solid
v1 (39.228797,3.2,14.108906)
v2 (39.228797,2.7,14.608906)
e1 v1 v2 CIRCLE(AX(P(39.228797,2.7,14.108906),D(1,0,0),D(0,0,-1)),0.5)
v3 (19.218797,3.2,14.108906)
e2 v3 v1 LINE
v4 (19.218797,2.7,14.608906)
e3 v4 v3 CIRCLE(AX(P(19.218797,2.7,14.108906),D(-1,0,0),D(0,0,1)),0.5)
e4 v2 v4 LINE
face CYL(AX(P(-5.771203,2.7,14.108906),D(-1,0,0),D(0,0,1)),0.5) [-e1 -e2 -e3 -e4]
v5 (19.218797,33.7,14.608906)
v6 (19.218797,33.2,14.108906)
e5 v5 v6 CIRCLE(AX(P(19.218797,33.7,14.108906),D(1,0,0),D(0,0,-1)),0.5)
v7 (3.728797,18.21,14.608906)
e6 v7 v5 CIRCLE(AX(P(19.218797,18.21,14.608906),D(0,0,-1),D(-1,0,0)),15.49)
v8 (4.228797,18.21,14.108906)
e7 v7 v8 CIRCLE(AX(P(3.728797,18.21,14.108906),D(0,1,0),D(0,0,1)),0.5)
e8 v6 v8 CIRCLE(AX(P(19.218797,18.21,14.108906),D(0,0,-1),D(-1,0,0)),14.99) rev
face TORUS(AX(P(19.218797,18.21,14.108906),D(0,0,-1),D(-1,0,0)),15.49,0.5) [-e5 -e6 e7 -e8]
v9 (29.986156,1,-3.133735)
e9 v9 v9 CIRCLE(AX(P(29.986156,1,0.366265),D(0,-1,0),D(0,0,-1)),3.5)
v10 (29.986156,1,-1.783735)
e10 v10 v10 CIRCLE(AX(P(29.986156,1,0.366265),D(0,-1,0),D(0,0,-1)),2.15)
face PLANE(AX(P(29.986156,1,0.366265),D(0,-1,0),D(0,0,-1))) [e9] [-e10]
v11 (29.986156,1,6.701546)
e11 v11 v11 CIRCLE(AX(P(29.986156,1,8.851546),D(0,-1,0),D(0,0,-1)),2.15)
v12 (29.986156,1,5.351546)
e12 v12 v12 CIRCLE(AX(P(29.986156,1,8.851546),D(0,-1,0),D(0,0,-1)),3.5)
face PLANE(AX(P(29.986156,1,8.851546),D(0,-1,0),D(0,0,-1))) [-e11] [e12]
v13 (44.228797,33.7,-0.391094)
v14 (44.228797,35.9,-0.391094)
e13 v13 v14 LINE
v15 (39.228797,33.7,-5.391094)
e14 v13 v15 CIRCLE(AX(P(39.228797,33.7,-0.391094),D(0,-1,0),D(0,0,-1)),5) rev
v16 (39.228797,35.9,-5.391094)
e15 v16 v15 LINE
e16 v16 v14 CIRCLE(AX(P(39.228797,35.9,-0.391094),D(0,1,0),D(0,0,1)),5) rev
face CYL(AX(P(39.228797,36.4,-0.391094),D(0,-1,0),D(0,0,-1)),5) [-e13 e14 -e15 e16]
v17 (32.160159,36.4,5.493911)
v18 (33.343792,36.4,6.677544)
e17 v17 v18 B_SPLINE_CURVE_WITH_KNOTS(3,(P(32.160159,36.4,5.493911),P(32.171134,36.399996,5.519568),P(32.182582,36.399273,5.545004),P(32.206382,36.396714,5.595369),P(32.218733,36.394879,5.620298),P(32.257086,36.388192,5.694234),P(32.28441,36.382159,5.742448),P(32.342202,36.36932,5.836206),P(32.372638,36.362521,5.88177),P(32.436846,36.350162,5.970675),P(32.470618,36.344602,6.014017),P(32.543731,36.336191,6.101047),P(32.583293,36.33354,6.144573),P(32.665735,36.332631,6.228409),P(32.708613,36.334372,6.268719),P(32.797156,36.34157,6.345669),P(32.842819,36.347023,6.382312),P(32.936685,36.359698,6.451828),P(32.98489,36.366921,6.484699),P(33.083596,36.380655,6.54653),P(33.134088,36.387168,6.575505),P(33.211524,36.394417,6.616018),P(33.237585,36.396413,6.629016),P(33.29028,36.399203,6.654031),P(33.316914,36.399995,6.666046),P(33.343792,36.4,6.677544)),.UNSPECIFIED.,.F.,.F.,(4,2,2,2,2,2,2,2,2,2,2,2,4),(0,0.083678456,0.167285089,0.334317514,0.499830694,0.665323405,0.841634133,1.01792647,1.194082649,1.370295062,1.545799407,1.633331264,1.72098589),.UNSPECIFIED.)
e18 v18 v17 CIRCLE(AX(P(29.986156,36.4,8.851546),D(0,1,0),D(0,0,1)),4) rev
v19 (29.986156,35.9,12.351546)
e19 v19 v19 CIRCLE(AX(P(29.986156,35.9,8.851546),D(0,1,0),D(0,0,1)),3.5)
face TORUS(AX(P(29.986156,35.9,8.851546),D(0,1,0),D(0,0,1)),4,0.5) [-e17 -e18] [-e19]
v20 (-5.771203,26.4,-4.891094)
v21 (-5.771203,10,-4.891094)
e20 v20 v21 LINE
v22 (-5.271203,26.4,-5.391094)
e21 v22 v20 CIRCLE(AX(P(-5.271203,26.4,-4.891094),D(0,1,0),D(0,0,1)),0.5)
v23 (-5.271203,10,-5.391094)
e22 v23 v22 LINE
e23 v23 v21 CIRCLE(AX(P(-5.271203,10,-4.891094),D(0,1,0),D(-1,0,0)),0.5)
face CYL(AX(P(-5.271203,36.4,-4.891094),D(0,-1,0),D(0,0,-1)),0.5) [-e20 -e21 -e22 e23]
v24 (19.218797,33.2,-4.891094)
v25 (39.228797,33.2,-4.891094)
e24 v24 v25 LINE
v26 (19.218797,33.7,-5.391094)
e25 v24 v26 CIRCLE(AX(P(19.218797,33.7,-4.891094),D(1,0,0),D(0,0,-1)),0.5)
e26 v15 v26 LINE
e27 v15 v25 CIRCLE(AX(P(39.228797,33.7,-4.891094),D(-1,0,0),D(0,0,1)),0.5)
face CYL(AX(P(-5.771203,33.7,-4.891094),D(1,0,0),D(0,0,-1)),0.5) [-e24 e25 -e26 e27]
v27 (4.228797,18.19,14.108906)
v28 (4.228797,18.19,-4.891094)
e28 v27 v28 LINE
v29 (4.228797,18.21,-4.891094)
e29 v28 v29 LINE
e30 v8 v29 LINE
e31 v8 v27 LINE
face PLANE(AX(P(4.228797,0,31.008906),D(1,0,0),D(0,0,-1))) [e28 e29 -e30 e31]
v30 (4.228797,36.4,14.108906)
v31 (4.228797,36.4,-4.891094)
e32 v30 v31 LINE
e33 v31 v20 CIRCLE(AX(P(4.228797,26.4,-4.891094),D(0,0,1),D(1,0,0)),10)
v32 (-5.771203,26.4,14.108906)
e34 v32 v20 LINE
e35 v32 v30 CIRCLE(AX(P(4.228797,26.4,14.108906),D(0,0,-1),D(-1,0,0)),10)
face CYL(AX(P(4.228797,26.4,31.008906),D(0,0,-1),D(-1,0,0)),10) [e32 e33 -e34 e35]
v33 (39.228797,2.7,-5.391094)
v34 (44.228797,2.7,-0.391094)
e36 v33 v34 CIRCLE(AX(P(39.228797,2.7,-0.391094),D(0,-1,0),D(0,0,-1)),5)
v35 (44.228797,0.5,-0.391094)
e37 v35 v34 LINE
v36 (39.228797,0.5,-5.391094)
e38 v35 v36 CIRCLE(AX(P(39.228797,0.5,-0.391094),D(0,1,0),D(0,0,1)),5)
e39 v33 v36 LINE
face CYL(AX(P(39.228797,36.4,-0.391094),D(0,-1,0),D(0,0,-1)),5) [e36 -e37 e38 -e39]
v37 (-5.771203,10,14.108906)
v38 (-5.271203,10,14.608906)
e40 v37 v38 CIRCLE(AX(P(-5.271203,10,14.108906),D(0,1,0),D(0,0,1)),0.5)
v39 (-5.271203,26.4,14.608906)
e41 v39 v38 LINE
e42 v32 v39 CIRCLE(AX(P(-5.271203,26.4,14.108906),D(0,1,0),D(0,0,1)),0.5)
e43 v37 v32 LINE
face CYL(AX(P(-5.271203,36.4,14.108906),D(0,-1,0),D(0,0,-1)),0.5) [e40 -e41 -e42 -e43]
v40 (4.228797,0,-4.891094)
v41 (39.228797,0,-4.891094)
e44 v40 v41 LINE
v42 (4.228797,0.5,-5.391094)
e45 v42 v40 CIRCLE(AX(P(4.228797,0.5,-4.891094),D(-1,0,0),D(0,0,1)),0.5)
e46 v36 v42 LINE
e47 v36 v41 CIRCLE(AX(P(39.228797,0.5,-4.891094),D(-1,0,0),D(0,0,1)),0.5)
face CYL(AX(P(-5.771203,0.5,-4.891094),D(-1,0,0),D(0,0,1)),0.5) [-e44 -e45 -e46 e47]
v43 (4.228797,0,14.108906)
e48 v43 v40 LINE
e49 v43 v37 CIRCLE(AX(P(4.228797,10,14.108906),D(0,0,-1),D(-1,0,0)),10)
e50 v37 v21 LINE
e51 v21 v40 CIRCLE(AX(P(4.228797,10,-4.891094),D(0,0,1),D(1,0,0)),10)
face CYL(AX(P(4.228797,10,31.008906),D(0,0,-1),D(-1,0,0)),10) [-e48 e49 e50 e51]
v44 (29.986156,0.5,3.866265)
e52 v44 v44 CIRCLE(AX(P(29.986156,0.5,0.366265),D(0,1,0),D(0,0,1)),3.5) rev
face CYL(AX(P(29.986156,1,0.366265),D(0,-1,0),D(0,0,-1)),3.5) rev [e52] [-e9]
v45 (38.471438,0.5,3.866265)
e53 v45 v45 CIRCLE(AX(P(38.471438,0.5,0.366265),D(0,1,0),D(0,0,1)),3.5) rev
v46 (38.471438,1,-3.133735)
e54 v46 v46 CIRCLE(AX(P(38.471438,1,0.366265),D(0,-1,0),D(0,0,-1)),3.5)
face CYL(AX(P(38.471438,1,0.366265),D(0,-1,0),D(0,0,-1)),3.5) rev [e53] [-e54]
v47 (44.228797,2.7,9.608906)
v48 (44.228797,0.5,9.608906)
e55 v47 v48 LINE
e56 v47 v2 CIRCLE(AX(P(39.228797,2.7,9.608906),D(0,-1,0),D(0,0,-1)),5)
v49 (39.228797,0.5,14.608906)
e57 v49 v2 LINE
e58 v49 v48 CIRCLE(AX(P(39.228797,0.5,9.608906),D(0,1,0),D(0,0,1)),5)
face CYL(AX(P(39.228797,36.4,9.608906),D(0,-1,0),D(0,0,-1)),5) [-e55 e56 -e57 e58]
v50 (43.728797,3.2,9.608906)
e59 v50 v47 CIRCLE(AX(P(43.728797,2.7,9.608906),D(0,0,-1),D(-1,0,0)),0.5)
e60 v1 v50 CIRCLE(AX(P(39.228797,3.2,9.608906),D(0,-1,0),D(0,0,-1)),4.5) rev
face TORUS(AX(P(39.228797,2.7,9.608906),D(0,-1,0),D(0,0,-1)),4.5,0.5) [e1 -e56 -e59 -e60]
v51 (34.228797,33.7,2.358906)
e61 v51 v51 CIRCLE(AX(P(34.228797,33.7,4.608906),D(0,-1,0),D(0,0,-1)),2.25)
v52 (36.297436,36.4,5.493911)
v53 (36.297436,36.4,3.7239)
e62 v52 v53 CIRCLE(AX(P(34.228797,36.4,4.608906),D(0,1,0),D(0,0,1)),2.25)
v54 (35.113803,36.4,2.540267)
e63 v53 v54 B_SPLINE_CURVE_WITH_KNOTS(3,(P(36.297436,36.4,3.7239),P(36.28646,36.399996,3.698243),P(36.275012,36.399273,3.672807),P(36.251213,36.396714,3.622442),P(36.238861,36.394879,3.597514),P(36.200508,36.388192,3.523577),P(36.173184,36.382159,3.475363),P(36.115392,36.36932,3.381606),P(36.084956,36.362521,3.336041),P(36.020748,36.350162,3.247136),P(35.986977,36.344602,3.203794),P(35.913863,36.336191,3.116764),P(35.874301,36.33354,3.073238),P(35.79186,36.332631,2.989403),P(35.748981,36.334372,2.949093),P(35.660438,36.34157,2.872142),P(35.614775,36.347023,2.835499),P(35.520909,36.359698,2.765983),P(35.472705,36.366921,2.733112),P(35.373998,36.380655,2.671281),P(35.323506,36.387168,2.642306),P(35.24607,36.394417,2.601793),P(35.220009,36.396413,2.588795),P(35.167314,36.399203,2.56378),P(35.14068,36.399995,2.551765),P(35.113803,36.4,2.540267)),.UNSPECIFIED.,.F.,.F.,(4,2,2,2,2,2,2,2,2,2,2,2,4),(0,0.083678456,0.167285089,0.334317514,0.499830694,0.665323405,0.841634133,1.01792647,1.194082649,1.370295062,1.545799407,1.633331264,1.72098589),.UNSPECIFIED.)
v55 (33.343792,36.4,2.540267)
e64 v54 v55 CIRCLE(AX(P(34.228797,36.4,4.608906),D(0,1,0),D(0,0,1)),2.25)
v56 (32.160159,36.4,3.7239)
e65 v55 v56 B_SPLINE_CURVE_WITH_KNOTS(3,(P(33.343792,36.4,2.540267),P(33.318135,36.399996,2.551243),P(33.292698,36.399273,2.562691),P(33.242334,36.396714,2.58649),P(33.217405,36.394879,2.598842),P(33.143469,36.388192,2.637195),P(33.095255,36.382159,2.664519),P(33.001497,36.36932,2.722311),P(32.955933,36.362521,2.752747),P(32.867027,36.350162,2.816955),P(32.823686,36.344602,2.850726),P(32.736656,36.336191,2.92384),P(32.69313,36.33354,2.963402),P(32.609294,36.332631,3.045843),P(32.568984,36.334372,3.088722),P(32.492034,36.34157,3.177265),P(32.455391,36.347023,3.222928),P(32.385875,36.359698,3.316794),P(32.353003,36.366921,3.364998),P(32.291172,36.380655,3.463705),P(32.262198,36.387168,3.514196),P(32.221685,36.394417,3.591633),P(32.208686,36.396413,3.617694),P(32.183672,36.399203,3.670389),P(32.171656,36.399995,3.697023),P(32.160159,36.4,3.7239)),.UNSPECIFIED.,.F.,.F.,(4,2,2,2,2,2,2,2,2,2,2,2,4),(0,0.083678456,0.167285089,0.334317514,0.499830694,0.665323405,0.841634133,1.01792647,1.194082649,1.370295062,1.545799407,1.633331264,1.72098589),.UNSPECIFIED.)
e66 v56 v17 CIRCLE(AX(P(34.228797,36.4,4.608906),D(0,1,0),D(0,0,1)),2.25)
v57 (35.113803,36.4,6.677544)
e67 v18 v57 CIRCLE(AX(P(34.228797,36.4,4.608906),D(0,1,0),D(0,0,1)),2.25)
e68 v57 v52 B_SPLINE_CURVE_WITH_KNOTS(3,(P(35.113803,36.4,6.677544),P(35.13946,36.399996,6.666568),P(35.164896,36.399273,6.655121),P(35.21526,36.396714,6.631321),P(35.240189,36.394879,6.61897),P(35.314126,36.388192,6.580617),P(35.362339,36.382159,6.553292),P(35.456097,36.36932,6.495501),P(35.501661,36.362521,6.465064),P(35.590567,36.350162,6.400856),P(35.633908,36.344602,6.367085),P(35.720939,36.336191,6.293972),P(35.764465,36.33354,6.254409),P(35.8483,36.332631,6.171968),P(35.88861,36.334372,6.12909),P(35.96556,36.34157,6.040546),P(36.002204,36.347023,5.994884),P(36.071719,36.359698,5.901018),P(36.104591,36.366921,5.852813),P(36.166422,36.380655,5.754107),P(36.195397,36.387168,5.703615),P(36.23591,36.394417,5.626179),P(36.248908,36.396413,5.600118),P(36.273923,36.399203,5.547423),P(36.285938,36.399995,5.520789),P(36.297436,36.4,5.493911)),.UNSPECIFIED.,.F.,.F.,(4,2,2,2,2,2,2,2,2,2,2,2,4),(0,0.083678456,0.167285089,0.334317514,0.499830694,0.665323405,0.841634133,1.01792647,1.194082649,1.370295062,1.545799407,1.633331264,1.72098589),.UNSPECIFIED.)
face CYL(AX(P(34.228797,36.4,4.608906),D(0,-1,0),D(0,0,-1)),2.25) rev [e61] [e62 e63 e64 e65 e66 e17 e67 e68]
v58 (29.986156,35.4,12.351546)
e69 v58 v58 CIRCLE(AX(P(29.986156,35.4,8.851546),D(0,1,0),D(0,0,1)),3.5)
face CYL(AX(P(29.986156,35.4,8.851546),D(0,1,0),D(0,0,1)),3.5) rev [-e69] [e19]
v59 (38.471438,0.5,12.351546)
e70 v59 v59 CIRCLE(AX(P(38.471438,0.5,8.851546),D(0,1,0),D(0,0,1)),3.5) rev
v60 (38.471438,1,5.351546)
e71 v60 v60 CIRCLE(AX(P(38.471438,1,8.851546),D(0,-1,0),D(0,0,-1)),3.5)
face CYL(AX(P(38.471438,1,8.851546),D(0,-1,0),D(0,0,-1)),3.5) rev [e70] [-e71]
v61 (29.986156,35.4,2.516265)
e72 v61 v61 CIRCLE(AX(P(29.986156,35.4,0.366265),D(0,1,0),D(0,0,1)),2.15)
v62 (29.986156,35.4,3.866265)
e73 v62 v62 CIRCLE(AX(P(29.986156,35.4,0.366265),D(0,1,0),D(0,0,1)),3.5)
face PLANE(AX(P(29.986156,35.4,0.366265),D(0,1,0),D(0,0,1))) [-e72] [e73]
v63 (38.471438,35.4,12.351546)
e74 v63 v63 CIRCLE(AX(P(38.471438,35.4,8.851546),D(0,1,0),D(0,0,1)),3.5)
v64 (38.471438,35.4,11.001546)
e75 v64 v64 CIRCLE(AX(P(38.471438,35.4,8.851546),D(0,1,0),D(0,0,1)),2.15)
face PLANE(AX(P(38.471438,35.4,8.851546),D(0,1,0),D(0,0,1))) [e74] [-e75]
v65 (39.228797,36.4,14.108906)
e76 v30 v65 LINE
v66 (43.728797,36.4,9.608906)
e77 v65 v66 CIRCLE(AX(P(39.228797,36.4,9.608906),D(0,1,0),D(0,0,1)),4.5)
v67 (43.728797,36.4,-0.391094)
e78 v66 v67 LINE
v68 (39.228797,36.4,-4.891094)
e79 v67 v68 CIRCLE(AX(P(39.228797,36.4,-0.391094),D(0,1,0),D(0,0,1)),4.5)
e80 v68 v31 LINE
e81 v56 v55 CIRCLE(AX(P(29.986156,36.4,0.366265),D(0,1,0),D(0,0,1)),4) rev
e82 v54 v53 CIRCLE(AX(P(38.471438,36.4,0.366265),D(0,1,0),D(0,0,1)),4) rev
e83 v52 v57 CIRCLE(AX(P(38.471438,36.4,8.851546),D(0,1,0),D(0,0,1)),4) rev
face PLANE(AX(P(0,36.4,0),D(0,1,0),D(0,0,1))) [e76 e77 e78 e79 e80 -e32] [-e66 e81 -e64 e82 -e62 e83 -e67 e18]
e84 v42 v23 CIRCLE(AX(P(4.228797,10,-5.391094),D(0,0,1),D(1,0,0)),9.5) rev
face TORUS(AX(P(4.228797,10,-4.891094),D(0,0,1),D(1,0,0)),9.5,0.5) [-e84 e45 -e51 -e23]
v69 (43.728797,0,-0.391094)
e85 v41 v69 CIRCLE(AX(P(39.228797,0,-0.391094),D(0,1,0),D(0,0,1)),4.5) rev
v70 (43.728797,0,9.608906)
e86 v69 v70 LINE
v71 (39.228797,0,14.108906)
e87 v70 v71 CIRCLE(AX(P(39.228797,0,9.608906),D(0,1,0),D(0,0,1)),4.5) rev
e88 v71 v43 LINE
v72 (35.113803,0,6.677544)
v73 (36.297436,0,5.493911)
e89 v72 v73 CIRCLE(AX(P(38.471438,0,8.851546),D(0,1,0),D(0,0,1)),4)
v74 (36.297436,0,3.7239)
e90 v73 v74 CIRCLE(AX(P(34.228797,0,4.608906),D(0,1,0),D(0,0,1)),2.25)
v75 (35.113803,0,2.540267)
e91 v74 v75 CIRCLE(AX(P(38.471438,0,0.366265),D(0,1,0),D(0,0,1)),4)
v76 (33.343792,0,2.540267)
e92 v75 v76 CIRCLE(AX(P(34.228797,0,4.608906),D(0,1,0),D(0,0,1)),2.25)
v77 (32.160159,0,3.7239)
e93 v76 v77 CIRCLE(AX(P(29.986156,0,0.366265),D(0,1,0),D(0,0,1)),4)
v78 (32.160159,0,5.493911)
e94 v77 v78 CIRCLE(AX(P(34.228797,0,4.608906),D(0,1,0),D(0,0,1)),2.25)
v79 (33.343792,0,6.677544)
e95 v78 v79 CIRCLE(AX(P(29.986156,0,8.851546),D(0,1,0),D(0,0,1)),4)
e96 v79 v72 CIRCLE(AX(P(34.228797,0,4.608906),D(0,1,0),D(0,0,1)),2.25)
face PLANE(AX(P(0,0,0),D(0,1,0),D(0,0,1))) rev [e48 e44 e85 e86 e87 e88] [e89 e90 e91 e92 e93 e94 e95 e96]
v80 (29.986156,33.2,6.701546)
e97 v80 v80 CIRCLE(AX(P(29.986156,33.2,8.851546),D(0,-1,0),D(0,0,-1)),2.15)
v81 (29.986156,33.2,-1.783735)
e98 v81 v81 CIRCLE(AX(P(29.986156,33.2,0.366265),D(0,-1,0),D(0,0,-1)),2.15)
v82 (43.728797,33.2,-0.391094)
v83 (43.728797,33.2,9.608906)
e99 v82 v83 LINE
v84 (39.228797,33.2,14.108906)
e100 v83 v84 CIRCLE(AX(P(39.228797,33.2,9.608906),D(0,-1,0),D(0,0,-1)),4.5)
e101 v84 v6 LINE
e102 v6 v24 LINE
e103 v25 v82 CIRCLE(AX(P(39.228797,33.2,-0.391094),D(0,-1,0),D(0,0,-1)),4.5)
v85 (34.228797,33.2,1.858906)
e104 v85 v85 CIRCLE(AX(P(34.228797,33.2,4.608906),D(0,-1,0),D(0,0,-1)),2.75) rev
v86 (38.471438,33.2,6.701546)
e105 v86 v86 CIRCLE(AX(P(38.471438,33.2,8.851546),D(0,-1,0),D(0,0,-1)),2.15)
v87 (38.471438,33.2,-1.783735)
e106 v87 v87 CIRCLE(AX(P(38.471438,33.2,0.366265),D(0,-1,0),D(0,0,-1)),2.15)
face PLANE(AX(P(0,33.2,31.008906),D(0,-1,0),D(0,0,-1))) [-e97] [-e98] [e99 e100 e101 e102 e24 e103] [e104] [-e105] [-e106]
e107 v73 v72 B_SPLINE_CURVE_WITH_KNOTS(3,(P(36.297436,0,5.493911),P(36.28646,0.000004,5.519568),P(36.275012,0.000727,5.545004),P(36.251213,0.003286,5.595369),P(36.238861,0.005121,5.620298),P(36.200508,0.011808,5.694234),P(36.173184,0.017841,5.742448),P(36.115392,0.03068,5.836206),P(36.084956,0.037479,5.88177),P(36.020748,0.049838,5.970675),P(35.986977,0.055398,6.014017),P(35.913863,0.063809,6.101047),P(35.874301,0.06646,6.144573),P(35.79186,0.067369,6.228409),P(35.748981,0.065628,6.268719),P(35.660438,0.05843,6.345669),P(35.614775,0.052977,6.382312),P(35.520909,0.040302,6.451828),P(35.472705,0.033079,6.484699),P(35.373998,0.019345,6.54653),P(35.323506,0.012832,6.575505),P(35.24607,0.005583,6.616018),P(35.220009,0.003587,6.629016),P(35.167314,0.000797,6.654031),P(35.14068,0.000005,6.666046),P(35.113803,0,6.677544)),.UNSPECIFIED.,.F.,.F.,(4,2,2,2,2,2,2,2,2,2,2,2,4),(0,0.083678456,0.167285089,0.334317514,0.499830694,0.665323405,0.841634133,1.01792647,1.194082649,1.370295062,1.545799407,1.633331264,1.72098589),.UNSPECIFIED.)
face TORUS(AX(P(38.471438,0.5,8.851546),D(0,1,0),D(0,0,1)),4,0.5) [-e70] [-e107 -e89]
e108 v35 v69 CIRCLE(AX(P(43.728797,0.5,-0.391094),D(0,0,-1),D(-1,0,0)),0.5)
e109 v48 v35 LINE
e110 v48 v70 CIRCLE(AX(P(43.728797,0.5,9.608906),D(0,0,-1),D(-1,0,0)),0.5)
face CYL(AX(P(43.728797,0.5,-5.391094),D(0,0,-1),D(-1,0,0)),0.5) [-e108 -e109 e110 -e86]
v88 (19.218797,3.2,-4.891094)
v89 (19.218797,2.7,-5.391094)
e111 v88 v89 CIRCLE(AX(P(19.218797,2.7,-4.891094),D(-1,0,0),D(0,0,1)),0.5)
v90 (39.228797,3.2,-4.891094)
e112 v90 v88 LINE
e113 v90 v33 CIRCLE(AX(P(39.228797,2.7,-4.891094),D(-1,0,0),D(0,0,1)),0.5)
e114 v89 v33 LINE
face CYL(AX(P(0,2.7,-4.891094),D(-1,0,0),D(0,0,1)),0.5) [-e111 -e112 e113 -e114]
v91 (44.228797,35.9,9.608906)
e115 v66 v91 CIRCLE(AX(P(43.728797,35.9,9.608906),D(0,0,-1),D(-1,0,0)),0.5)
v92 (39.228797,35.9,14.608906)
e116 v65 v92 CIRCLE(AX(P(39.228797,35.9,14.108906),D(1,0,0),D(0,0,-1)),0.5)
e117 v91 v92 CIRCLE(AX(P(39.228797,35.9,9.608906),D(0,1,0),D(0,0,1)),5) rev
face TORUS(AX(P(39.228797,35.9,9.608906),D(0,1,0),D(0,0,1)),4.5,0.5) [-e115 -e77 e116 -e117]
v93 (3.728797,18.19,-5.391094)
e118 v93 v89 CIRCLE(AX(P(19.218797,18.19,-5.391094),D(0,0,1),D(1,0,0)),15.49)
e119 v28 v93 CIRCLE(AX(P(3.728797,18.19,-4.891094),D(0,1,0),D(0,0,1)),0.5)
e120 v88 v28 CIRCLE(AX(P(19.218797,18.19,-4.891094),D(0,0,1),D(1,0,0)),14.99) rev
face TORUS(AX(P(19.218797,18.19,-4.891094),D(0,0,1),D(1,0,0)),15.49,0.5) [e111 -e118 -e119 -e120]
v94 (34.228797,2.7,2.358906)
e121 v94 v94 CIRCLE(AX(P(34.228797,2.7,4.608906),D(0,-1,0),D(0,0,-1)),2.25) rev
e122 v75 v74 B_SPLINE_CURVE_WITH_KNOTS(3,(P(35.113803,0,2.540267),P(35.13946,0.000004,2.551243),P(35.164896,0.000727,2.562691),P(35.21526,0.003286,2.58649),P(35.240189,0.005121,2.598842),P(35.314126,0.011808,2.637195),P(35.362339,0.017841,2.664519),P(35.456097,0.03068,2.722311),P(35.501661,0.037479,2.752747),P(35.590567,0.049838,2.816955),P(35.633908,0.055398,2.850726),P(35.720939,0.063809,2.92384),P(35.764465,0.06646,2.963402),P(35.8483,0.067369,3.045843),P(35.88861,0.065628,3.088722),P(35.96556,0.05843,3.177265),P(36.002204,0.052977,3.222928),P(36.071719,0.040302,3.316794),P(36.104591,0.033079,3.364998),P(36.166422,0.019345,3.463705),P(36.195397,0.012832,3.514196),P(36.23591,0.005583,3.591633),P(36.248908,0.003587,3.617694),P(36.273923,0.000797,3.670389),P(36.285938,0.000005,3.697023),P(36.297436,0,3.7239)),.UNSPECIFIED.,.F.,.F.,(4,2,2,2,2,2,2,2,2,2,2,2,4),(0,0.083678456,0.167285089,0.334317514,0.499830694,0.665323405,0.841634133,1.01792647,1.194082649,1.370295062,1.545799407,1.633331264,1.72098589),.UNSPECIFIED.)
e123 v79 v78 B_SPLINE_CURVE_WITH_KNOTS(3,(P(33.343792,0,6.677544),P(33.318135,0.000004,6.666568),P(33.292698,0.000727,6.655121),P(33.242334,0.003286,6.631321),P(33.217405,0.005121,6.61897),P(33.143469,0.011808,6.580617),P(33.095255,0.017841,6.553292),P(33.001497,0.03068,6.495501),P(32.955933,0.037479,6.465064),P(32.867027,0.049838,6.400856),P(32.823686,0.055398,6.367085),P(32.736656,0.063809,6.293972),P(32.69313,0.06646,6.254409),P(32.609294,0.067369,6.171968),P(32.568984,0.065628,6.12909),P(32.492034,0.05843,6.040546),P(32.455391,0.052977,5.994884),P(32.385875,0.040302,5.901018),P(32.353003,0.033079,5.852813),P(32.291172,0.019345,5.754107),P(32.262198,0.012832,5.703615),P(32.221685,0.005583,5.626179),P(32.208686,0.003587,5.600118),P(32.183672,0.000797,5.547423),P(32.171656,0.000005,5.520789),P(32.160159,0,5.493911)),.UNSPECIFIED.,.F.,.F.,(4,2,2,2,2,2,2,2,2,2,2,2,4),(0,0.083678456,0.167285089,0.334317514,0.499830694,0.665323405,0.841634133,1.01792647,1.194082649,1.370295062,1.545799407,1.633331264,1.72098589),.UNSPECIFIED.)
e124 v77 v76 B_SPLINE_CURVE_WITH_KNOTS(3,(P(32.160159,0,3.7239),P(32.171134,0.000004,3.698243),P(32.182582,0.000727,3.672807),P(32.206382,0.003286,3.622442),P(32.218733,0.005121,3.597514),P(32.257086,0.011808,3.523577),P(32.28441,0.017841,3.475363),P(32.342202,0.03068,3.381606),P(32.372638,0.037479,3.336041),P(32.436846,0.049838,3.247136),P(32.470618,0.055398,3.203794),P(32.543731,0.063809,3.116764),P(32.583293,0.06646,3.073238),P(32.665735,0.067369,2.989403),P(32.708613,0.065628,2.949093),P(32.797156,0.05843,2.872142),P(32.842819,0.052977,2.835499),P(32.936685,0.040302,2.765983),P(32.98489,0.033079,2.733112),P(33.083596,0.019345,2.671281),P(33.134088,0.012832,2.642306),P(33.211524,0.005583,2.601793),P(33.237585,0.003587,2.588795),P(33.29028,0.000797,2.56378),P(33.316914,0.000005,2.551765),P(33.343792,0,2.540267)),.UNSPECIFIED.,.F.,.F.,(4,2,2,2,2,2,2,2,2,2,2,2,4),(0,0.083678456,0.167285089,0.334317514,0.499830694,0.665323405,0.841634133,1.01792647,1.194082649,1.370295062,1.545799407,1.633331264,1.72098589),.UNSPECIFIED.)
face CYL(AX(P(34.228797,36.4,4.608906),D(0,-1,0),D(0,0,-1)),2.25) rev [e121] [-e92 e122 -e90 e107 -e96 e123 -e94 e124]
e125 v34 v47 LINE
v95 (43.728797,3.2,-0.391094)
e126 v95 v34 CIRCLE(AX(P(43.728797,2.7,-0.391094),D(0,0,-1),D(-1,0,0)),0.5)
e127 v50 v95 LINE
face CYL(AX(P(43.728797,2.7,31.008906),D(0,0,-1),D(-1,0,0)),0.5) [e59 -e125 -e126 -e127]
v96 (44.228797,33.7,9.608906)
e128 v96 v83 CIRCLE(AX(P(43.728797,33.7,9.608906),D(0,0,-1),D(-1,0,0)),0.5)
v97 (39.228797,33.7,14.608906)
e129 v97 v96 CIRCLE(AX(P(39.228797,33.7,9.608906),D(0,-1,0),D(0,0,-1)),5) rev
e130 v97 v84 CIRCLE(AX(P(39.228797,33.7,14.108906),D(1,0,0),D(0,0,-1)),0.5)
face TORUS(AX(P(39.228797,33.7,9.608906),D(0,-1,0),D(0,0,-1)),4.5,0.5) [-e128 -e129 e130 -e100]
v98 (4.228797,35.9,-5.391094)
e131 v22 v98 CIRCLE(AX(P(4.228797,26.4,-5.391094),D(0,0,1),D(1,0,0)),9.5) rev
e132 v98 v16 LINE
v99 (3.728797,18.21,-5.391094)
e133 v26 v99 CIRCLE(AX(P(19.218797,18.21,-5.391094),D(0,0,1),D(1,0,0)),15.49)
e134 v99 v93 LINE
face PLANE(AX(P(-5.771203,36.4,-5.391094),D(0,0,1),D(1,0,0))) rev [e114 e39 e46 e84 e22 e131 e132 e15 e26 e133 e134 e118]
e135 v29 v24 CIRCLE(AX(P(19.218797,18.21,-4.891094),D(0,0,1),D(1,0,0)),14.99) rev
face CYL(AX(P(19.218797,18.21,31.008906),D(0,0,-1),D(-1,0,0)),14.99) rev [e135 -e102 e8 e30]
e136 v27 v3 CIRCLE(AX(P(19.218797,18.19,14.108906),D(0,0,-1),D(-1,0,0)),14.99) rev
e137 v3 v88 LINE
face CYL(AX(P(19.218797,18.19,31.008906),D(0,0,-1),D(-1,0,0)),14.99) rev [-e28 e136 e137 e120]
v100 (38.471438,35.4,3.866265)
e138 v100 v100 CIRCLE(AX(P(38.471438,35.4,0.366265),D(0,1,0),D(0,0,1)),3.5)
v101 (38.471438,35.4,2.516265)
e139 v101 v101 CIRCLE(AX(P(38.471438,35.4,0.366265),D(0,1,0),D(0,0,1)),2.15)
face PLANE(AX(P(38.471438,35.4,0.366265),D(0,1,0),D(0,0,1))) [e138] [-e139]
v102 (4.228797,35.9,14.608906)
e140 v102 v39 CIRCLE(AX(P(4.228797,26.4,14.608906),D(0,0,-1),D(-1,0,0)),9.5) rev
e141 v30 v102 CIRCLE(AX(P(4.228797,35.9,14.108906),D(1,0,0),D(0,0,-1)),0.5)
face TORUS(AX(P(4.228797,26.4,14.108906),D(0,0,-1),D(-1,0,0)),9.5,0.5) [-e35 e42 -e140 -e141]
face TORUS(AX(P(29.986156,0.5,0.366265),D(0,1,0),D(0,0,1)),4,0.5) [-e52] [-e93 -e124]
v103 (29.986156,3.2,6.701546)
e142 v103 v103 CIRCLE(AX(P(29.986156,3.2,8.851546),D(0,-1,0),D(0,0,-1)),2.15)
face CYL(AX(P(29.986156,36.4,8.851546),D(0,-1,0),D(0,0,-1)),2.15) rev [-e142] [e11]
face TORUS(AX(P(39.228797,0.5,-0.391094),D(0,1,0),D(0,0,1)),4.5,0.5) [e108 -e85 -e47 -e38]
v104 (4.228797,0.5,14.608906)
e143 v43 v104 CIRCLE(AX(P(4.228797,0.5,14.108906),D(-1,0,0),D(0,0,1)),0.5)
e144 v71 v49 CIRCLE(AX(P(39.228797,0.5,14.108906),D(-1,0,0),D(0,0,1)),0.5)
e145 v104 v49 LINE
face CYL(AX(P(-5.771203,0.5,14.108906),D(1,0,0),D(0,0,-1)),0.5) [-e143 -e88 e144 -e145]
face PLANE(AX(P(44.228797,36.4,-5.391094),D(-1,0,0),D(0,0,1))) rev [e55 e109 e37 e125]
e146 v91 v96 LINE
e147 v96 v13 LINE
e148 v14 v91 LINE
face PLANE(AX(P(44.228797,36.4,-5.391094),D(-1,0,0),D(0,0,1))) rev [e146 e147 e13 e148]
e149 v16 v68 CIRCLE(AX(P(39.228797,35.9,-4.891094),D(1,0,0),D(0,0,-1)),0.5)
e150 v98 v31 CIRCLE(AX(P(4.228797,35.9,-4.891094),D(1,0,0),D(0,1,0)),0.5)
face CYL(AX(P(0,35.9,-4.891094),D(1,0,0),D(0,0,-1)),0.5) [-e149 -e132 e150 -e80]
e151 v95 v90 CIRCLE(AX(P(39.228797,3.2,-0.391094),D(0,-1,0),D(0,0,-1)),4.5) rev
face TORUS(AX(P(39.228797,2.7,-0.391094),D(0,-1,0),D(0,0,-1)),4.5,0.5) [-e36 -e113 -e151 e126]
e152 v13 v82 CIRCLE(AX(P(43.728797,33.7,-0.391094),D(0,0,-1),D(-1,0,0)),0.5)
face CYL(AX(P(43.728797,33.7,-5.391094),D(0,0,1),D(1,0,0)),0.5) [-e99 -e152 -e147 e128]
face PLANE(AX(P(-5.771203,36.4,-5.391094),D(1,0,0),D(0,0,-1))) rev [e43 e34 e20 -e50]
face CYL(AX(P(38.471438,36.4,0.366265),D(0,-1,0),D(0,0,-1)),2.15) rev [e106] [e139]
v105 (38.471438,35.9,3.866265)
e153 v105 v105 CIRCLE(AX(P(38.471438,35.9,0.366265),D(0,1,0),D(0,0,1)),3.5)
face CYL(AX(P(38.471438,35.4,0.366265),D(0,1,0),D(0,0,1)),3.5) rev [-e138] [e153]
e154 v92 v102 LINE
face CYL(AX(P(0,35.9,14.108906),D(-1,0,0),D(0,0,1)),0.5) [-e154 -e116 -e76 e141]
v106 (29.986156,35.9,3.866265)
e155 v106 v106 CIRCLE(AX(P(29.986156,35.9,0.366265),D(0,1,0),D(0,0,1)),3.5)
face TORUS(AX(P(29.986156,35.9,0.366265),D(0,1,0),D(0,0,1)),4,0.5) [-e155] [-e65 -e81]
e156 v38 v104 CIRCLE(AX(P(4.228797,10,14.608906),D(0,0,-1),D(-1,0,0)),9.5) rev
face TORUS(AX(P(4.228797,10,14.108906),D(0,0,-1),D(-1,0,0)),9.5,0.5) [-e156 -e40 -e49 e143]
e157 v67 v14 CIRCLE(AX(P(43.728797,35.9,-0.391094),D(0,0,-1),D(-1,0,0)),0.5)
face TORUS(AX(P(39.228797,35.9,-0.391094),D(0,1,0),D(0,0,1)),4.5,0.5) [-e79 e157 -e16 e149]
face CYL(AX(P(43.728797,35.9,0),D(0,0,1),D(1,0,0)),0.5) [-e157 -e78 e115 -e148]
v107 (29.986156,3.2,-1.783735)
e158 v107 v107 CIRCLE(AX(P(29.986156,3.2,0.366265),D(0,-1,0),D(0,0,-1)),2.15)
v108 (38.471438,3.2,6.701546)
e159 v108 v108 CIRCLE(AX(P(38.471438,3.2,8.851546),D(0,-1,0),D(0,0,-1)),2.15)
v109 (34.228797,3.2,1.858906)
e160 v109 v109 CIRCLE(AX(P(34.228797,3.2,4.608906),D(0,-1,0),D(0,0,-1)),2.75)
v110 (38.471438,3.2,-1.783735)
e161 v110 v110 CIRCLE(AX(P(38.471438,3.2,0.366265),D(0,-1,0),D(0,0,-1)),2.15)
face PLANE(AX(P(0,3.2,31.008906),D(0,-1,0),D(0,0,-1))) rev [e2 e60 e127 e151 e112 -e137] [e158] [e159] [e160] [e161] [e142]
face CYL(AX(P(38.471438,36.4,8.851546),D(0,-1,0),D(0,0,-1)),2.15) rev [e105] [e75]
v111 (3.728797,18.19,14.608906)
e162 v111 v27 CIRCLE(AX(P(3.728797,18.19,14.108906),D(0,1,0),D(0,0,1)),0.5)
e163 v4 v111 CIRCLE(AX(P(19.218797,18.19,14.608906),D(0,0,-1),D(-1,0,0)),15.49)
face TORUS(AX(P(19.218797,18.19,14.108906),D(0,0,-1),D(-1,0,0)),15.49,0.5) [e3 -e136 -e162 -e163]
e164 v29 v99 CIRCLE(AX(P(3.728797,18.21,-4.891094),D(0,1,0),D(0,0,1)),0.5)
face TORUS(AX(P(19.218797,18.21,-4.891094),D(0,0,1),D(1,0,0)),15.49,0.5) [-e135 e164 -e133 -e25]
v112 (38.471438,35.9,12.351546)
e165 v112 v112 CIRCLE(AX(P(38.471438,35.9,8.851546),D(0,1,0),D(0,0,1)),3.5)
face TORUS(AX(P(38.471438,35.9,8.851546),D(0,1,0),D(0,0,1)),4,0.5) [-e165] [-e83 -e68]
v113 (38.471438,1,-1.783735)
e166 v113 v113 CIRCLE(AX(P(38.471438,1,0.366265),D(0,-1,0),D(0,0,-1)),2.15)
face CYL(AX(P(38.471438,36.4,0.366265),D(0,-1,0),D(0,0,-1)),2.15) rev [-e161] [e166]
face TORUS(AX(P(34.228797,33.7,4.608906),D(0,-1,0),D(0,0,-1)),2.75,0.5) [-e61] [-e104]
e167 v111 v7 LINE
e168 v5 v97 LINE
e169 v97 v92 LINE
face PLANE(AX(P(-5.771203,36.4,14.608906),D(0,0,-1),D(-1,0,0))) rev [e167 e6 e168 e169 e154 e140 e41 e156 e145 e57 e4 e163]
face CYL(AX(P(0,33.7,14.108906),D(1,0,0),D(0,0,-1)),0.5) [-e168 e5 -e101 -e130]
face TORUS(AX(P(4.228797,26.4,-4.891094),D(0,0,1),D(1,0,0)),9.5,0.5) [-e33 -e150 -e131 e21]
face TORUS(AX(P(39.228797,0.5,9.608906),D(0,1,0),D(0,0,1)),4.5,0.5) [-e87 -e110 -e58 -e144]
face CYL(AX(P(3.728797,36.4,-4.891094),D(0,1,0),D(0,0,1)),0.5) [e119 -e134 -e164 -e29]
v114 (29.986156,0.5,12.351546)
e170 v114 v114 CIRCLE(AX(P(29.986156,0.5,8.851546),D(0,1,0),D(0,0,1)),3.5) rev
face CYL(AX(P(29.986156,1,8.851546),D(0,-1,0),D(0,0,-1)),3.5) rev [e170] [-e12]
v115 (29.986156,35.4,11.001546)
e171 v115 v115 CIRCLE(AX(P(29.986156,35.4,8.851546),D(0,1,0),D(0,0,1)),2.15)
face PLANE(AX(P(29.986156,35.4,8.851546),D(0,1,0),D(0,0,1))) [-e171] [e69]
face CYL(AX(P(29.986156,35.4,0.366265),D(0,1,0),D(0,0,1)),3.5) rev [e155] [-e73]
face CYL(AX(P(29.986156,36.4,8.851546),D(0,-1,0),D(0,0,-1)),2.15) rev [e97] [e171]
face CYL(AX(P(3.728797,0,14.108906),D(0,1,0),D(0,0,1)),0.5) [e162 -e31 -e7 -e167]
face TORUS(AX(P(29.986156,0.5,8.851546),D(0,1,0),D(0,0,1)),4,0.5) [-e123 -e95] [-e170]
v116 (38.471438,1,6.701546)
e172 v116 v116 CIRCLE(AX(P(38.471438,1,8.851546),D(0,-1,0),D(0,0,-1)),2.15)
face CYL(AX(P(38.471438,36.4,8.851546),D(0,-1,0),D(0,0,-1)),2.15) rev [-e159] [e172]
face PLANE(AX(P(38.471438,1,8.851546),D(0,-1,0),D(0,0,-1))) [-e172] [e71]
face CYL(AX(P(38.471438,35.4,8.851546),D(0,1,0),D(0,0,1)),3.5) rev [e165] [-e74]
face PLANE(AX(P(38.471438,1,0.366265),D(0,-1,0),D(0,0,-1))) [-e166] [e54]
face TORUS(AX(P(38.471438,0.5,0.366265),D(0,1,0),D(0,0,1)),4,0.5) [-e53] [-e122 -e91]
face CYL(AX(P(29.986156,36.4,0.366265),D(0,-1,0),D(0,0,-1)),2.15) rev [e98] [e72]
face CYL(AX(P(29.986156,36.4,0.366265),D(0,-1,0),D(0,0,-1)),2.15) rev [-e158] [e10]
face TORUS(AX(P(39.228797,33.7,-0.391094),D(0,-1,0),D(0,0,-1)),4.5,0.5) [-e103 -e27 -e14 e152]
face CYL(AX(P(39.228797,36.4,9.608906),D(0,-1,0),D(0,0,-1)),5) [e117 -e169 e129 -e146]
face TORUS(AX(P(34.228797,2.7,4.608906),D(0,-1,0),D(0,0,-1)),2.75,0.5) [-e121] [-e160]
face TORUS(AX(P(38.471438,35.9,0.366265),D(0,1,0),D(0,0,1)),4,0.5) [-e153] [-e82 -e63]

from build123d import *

# Parameters (mm, degrees)
SKETCH1_W           = 50
SKETCH1_H           = 20
SKETCH1_R           = 2.25
SKETCH1_R_2         = 2.15
BOSS_EXTRUDE1_DEPTH = 36.4
CUT_EXTRUDE1_DEPTH  = 36.4
SKETCH4_R           = 3.5
CUT_EXTRUDE2_DEPTH  = 1
FILLET1_R           = 0.5
FILLET2_R           = 0.5
CUT_EXTRUDE3_START  = -1
SKETCH6_R           = 3.5
CUT_EXTRUDE3_DEPTH  = 1
FILLET3_R           = 0.5
FILLET4_R           = 5
FILLET5_R           = 0.5


with BuildPart() as part:
    # Sketch1 → Boss-Extrude1 (new body)
    with BuildSketch(Plane(origin=(0, 0, 0), x_dir=(1, 0, 0), z_dir=(0, 1, 0))):
        with Locations((19.228797112, -4.608905713)):
            Rectangle(SKETCH1_W, SKETCH1_H)
        with Locations(Location((34.228797112, -4.608905713, 0), (0, 0, 270))):
            Circle(SKETCH1_R, mode=Mode.SUBTRACT)
        with Locations(Location((38.471437799, -8.8515464, 0), (0, 0, 270))):
            Circle(SKETCH1_R_2, mode=Mode.SUBTRACT)
        with Locations(Location((29.986156424, -8.8515464, 0), (0, 0, 270))):
            Circle(SKETCH1_R_2, mode=Mode.SUBTRACT)
        with Locations(Location((29.986156424, -0.366265025, 0), (0, 0, 270))):
            Circle(SKETCH1_R_2, mode=Mode.SUBTRACT)
        with Locations(Location((38.471437799, -0.366265025, 0), (0, 0, 270))):
            Circle(SKETCH1_R_2, mode=Mode.SUBTRACT)
    extrude(amount=BOSS_EXTRUDE1_DEPTH)

    # Sketch2 → Cut-Extrude1 (cut)
    with BuildSketch(Plane(origin=(0, 0, -5.391094287), x_dir=(-1, 0, 0), z_dir=(0, 0, -1))):
        with BuildLine():
            Line((-19.218797112, 33.2), (-44.228797112, 33.2))
            Line((-44.228797112, 33.2), (-44.228797112, 3.2))
            Line((-44.228797112, 3.2), (-19.218797112, 3.2))
            ThreePointArc((-19.218797112, 3.2), (-8.619266462, 7.59046935), (-4.228797112, 18.19))
            Line((-4.228797112, 18.19), (-4.228797112, 18.21))
            ThreePointArc((-4.228797112, 18.21), (-8.619266462, 28.80953065), (-19.218797112, 33.2))
        make_face()
        with BuildLine():
            Line((5.771202888, 36.4), (-4.228797112, 36.4))
            ThreePointArc((-4.228797112, 36.4), (2.8422707, 33.471067812), (5.771202888, 26.4))
            Line((5.771202888, 26.4), (5.771202888, 36.4))
        make_face()
        with BuildLine():
            ThreePointArc((5.771202888, 10), (2.8422707, 2.928932188), (-4.228797112, 0))
            Line((-4.228797112, 0), (5.771202888, 0))
            Line((5.771202888, 0), (5.771202888, 10))
        make_face()
    extrude(amount=-CUT_EXTRUDE1_DEPTH, mode=Mode.SUBTRACT)

    # Sketch4 → Cut-Extrude2 (cut)
    with BuildSketch(Plane.XZ):
        with Locations(Location((29.986156424, 8.8515464, 0), (0, 0, 270))):
            Circle(SKETCH4_R)
        with Locations(Location((38.471437799, 8.8515464, 0), (0, 0, 270))):
            Circle(SKETCH4_R)
        with Locations(Location((38.471437799, 0.366265025, 0), (0, 0, 270))):
            Circle(SKETCH4_R)
        with Locations(Location((29.986156424, 0.366265025, 0), (0, 0, 270))):
            Circle(SKETCH4_R)
    extrude(amount=-CUT_EXTRUDE2_DEPTH, mode=Mode.SUBTRACT)

    # Fillet1
    # the kernel refuses this fillet: 0.5 mm, written as the material it takes off along each edge
    with BuildSketch(Plane(origin=(29.986156424, 0, 8.8515464), x_dir=(0, 0, -1), z_dir=(-1, 0, 0))) as fillet1_piece_1:
        with BuildLine():
            CenterArc((3.5 + FILLET1_R, -FILLET1_R), FILLET1_R, 90, 90)
            Line((3.5, -FILLET1_R), (3.5, 0))
            Line((3.5, 0), (3.5 + FILLET1_R, 0))
        make_face()
    revolve(axis=Axis((29.986156424, 0, 8.8515464), (0, -1, 0)), mode=Mode.SUBTRACT)
    with BuildSketch(Plane(origin=(38.471437799, 0, 8.8515464), x_dir=(0, 0, -1), z_dir=(-1, 0, 0))) as fillet1_piece_2:
        with BuildLine():
            CenterArc((3.5 + FILLET1_R, -FILLET1_R), FILLET1_R, 90, 90)
            Line((3.5, -FILLET1_R), (3.5, 0))
            Line((3.5, 0), (3.5 + FILLET1_R, 0))
        make_face()
    revolve(axis=Axis((38.471437799, 0, 8.8515464), (0, -1, 0)), mode=Mode.SUBTRACT)
    with BuildSketch(Plane(origin=(38.471437799, 0, 0.366265025), x_dir=(0, 0, -1), z_dir=(-1, 0, 0))) as fillet1_piece_3:
        with BuildLine():
            CenterArc((3.5 + FILLET1_R, -FILLET1_R), FILLET1_R, 90, 90)
            Line((3.5, -FILLET1_R), (3.5, 0))
            Line((3.5, 0), (3.5 + FILLET1_R, 0))
        make_face()
    revolve(axis=Axis((38.471437799, 0, 0.366265025), (0, -1, 0)), mode=Mode.SUBTRACT)
    with BuildSketch(Plane(origin=(29.986156424, 0, 0.366265025), x_dir=(0, 0, -1), z_dir=(-1, 0, 0))) as fillet1_piece_4:
        with BuildLine():
            CenterArc((3.5 + FILLET1_R, -FILLET1_R), FILLET1_R, 90, 90)
            Line((3.5, -FILLET1_R), (3.5, 0))
            Line((3.5, 0), (3.5 + FILLET1_R, 0))
        make_face()
    revolve(axis=Axis((29.986156424, 0, 0.366265025), (0, -1, 0)), mode=Mode.SUBTRACT)
    with BuildSketch(Plane(origin=(34.228797112, 3.2, 4.608905713), x_dir=(0, 0, 1), z_dir=(1, 0, 0))) as fillet1_piece_5:
        with BuildLine():
            CenterArc((2.25 + FILLET1_R, FILLET1_R), FILLET1_R, 180, 90)
            Line((2.25, FILLET1_R), (2.25, 0))
            Line((2.25, 0), (2.25 + FILLET1_R, 0))
        make_face()
    revolve(axis=Axis((34.228797112, 3.2, 4.608905713), (0, -1, 0)), mode=Mode.SUBTRACT)

    # Fillet2
    fillet2_edges = [part.edges().sort_by_distance(p)[0] for p in [
        (34.228797112, 33.2, 2.358905713),
    ]]
    fillet(fillet2_edges, radius=FILLET2_R)

    # Sketch6 → Cut-Extrude3 (cut)
    with BuildSketch(Plane(origin=(0, 36.4, 0), x_dir=(1, 0, 0), z_dir=(0, 1, 0)).offset(CUT_EXTRUDE3_START)):
        with Locations(Location((29.986156424, -0.366265025, 0), (0, 0, 90))):
            Circle(SKETCH6_R)
        with Locations(Location((38.471437799, -0.366265025, 0), (0, 0, 90))):
            Circle(SKETCH6_R)
        with Locations(Location((38.471437799, -8.8515464, 0), (0, 0, 90))):
            Circle(SKETCH6_R)
        with Locations(Location((29.986156424, -8.8515464, 0), (0, 0, 90))):
            Circle(SKETCH6_R)
    extrude(amount=CUT_EXTRUDE3_DEPTH, mode=Mode.SUBTRACT)

    # Fillet3
    # the kernel refuses this fillet: 0.5 mm, written as the material it takes off along each edge
    with BuildSketch(Plane(origin=(29.986156424, 36.4, 0.366265025), x_dir=(0, 0, -1), z_dir=(1, 0, 0))) as fillet3_piece_1:
        with BuildLine():
            CenterArc((3.5 + FILLET3_R, -FILLET3_R), FILLET3_R, 90, 90)
            Line((3.5, -FILLET3_R), (3.5, 0))
            Line((3.5, 0), (3.5 + FILLET3_R, 0))
        make_face()
    revolve(axis=Axis((29.986156424, 36.4, 0.366265025), (0, 1, 0)), mode=Mode.SUBTRACT)
    with BuildSketch(Plane(origin=(38.471437799, 36.4, 0.366265025), x_dir=(0, 0, -1), z_dir=(1, 0, 0))) as fillet3_piece_2:
        with BuildLine():
            CenterArc((3.5 + FILLET3_R, -FILLET3_R), FILLET3_R, 90, 90)
            Line((3.5, -FILLET3_R), (3.5, 0))
            Line((3.5, 0), (3.5 + FILLET3_R, 0))
        make_face()
    revolve(axis=Axis((38.471437799, 36.4, 0.366265025), (0, 1, 0)), mode=Mode.SUBTRACT)
    with BuildSketch(Plane(origin=(38.471437799, 36.4, 8.8515464), x_dir=(0, 0, -1), z_dir=(1, 0, 0))) as fillet3_piece_3:
        with BuildLine():
            CenterArc((3.5 + FILLET3_R, -FILLET3_R), FILLET3_R, 90, 90)
            Line((3.5, -FILLET3_R), (3.5, 0))
            Line((3.5, 0), (3.5 + FILLET3_R, 0))
        make_face()
    revolve(axis=Axis((38.471437799, 36.4, 8.8515464), (0, 1, 0)), mode=Mode.SUBTRACT)
    with BuildSketch(Plane(origin=(29.986156424, 36.4, 8.8515464), x_dir=(0, 0, -1), z_dir=(1, 0, 0))) as fillet3_piece_4:
        with BuildLine():
            CenterArc((3.5 + FILLET3_R, -FILLET3_R), FILLET3_R, 90, 90)
            Line((3.5, -FILLET3_R), (3.5, 0))
            Line((3.5, 0), (3.5 + FILLET3_R, 0))
        make_face()
    revolve(axis=Axis((29.986156424, 36.4, 8.8515464), (0, 1, 0)), mode=Mode.SUBTRACT)

    # Fillet4
    fillet4_edges = [part.edges().sort_by_distance(p)[0] for p in [
        (44.228797112, 1.6, -5.391094287),
        (44.228797112, 1.6, 14.608905713),
        (44.228797112, 34.8, -5.391094287),
        (44.228797112, 34.8, 14.608905713),
    ]]
    fillet(fillet4_edges, radius=FILLET4_R)

    # Fillet5
    fillet5_edges = [part.edges().sort_by_distance(p)[0] for p in [
        (21.728797112, 36.4, -5.391094287),
        (29.223797112, 33.2, -5.391094287),
        (29.223797112, 3.2, -5.391094287),
        (21.728797112, 0, -5.391094287),
        (44.228797112, 0, 4.608905713),
        (42.764331018, 0, 13.144439619),
        (42.764331018, 0, -3.926628193),
        (44.228797112, 3.2, 4.608905713),
        (29.223797112, 3.2, 14.608905713),
        (42.764331018, 3.2, 13.144439619),
        (42.764331018, 3.2, -3.926628193),
        (29.223797112, 33.2, 14.608905713),
        (44.228797112, 33.2, 4.608905713),
        (44.228797112, 36.4, 4.608905713),
        (42.764331018, 33.2, -3.926628193),
        (42.764331018, 33.2, 13.144439619),
        (42.764331018, 36.4, -3.926628193),
        (42.764331018, 36.4, 13.144439619),
        (8.619266462, 28.80953065, -5.391094287),
        (4.228797112, 18.2, -5.391094287),
        (8.619266462, 7.59046935, -5.391094287),
        (8.619266462, 28.80953065, 14.608905713),
        (4.228797112, 18.2, 14.608905713),
        (8.619266462, 7.59046935, 14.608905713),
        (-5.771202888, 18.2, -5.391094287),
        (21.728797112, 36.4, 14.608905713),
        (-5.771202888, 18.2, 14.608905713),
        (21.728797112, 0, 14.608905713),
        (-2.8422707, 33.471067812, 14.608905713),
        (-2.8422707, 33.471067812, -5.391094287),
        (-2.8422707, 2.928932188, -5.391094287),
        (-2.8422707, 2.928932188, 14.608905713),
    ]]
    fillet(fillet5_edges, radius=FILLET5_R)


solid = part.part
